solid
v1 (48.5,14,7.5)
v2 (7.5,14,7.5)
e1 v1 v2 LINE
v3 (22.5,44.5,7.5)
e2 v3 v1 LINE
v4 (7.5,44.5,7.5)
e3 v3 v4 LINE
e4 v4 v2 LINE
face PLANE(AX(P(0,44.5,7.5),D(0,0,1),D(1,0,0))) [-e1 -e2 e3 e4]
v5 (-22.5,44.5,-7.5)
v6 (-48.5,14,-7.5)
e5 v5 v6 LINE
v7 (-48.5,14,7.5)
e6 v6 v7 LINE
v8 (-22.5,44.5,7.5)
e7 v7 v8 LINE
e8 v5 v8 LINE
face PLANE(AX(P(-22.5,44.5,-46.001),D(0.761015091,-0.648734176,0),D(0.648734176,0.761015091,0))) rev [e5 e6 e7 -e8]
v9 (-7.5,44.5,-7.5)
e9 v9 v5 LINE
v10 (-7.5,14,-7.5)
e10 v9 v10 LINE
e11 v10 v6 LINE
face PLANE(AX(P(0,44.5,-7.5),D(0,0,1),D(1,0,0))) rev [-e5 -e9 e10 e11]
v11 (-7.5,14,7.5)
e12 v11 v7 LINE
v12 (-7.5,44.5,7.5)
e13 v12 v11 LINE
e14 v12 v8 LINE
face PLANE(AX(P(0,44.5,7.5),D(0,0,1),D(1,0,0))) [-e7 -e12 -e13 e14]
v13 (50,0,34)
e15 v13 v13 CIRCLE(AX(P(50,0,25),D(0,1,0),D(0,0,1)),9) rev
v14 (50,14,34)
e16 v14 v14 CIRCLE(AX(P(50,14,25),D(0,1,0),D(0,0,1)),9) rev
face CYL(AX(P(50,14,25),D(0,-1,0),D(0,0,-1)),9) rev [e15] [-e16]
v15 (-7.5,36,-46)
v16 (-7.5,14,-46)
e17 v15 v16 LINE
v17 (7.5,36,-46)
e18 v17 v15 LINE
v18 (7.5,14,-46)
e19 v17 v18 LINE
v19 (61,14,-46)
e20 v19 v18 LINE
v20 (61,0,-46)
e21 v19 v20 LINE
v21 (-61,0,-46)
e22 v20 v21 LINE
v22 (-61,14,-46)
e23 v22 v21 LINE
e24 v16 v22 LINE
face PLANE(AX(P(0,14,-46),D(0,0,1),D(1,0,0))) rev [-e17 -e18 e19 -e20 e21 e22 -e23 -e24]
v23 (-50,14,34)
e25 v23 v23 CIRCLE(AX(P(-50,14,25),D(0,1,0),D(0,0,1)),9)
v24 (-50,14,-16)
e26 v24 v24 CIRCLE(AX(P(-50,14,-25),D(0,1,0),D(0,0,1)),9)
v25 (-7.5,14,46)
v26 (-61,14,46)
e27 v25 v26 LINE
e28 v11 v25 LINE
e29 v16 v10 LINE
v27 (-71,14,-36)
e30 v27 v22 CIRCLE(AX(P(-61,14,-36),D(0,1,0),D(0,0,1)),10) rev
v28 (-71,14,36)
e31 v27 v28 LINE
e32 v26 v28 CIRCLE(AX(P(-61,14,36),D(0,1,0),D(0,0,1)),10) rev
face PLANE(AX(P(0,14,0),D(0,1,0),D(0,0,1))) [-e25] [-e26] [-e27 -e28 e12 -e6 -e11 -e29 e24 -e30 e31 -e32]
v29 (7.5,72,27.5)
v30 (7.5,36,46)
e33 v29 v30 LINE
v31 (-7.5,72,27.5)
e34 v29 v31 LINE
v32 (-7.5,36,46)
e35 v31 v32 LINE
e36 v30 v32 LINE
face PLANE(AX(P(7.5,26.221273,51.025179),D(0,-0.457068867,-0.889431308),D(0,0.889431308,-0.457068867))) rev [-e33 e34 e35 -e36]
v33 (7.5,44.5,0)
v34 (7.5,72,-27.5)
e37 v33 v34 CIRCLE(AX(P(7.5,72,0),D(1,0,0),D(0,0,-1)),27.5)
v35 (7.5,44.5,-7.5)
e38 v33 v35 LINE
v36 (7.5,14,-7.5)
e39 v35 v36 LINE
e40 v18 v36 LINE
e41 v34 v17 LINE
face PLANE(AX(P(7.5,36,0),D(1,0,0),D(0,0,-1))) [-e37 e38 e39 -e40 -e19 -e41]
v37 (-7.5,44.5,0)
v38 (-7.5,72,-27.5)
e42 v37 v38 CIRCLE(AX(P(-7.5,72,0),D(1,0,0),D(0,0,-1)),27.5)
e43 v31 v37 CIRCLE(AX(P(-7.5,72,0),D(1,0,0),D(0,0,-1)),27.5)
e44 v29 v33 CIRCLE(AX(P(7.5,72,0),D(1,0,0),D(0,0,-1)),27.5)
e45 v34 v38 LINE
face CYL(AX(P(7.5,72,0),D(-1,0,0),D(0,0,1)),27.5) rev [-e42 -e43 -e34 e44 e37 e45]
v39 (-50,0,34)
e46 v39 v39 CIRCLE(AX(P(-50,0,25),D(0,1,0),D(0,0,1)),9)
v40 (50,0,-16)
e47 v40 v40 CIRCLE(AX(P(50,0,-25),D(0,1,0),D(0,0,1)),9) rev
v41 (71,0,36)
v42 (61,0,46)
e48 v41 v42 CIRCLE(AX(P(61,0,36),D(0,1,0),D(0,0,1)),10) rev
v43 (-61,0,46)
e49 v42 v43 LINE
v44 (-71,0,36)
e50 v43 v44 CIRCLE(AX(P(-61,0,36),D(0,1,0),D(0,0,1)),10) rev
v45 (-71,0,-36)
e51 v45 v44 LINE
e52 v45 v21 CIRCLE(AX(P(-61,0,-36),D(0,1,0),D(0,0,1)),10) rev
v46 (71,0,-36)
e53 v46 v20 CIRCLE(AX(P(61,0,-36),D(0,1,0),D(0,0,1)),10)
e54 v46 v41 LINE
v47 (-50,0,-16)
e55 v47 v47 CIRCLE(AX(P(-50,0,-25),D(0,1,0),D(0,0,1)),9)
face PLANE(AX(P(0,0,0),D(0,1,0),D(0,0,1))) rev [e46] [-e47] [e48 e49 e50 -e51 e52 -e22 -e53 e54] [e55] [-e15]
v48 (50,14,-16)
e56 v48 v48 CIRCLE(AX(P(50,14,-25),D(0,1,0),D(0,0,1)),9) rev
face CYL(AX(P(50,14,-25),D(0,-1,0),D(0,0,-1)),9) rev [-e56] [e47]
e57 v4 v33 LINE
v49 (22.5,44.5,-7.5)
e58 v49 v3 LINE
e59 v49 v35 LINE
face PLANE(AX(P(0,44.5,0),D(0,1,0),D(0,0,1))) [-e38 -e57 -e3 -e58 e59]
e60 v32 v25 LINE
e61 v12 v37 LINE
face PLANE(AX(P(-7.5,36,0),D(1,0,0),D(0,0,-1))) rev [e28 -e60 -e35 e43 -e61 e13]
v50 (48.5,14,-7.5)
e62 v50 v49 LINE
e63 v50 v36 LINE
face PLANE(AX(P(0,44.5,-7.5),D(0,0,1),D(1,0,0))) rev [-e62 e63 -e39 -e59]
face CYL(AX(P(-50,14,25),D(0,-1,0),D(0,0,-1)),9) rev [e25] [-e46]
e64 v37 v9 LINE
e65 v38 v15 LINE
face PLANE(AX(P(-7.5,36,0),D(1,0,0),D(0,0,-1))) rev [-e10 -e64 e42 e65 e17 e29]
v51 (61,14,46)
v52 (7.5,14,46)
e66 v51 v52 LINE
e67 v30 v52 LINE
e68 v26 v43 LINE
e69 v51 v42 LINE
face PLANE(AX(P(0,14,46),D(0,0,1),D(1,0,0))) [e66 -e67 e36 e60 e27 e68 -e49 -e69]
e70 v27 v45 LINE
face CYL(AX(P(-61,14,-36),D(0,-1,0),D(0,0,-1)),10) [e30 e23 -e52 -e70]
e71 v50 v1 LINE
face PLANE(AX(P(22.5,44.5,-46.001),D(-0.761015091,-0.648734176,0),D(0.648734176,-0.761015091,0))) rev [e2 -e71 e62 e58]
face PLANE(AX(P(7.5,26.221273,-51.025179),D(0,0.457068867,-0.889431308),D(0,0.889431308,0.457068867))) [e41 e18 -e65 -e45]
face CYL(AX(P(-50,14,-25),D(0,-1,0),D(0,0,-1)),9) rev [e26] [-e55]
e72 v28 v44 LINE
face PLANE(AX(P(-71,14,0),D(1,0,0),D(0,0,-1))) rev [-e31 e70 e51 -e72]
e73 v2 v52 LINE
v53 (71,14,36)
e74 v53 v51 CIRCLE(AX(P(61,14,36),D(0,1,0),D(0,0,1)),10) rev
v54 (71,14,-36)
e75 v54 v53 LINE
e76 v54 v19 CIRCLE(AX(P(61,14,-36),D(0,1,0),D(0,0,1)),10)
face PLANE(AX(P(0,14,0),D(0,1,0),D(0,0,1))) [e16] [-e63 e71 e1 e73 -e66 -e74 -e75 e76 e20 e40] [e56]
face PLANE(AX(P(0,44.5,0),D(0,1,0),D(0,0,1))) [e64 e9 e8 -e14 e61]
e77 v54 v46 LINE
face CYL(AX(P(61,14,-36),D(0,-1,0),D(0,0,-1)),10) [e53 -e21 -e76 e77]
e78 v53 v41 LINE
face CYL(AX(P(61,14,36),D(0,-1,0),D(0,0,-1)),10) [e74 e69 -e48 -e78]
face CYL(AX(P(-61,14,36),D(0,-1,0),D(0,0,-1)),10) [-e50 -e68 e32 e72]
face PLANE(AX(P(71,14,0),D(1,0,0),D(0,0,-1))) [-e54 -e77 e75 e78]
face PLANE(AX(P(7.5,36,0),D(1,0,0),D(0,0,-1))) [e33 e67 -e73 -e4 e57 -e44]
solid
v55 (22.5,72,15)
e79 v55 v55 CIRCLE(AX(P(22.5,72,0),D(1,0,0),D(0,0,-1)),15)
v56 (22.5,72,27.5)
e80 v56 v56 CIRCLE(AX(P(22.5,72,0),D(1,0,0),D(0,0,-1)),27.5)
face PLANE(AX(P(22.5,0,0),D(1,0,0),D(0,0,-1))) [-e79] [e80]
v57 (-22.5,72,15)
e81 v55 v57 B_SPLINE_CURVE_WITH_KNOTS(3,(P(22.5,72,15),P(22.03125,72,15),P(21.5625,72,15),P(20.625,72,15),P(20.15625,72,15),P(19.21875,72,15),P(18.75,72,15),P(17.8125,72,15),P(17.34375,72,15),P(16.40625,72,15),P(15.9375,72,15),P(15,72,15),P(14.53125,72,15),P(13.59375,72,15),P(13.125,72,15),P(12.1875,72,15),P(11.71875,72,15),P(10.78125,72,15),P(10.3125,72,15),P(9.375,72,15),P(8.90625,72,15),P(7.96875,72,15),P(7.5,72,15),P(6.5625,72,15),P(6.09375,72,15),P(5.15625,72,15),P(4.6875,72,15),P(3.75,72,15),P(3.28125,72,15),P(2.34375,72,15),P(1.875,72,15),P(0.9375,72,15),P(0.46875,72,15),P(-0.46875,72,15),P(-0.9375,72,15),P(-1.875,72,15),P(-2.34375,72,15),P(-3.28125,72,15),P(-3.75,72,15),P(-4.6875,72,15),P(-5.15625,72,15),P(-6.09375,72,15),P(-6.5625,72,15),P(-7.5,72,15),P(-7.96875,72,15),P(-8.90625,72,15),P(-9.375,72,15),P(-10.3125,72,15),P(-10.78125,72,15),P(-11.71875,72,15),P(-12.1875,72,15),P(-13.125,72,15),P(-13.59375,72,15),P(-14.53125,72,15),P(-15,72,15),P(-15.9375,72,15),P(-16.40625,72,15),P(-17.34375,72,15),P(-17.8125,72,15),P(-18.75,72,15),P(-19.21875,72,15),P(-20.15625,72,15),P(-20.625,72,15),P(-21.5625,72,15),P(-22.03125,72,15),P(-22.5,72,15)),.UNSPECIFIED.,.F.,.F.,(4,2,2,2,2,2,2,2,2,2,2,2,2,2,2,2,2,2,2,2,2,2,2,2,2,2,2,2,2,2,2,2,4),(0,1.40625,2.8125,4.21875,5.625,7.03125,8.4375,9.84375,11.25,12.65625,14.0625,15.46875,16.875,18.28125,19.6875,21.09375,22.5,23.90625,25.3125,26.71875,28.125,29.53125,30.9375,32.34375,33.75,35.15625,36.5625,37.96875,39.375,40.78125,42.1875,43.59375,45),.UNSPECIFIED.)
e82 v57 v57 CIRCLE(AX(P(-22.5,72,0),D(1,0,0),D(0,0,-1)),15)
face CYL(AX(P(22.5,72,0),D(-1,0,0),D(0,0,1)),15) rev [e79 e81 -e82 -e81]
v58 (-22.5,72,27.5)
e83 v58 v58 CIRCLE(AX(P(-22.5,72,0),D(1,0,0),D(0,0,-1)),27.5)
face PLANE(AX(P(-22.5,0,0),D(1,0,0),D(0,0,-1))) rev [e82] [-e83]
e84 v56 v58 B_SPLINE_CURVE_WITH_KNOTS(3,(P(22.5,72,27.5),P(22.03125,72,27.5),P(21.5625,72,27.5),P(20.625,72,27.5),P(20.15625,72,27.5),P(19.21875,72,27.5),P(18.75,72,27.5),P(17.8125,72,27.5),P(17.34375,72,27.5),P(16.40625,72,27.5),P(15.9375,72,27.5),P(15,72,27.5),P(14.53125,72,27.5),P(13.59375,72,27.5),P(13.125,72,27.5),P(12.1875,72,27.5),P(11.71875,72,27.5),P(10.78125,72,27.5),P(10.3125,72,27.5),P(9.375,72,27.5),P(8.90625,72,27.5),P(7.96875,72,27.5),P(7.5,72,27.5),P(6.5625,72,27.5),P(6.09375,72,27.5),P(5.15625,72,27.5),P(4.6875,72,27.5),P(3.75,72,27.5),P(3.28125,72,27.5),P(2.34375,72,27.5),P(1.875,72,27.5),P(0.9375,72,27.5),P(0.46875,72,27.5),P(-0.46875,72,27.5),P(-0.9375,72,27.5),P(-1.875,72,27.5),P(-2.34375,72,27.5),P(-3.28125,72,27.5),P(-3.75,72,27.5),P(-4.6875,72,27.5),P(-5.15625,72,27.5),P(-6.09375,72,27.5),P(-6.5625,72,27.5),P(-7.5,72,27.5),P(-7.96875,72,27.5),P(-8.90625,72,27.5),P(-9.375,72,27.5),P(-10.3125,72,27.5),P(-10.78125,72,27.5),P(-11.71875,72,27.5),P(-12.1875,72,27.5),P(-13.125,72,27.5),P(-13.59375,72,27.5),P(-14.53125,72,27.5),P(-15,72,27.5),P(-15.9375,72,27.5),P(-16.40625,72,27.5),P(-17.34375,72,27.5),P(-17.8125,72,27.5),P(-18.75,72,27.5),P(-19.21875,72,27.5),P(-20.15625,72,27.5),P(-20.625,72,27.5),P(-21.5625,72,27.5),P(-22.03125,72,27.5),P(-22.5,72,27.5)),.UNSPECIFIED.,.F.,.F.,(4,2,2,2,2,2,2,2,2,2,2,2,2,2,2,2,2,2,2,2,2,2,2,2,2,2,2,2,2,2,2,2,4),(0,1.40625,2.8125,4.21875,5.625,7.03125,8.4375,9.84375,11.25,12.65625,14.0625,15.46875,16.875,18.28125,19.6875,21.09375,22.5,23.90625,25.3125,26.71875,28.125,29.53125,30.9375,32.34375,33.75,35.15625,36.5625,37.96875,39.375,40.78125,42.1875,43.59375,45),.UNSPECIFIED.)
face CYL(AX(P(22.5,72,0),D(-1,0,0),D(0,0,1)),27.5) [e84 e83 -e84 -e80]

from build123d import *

# Parameters (mm, degrees)
SKETCH1_R                = 9
BOSS_EXTRUDE1_DEPTH      = 14
BOSS_EXTRUDE1_2_DEPTH    = 14
SKETCH1_5_W              = 15
SKETCH1_5_H              = 38.5
BOSS_EXTRUDE2_DEPTH      = 36
BOSS_EXTRUDE3_DEPTH      = 44.5
CUT_EXTRUDE1_REACH       = 101.416
SKETCH3_R                = 27.5
SKETCH3_R_2              = 15
BOSS_EXTRUDE4_DEPTH      = 22.5
BOSS_EXTRUDE19_START     = -7.5
BOSS_EXTRUDE19_OUTLINE_R = 15
BOSS_EXTRUDE19_DEPTH     = 15
BOSS_EXTRUDE19_2_DEPTH   = 15
SKETCH4_R                = 15
CUT_EXTRUDE2_DEPTH       = 87.5


# Read off the part's stored shape, not the designer's step: Boss-Extrude19
with BuildPart() as part:
    # Sketch1 → Boss-Extrude1 (new body)
    with BuildSketch(Plane(origin=(0, 0, 0), x_dir=(1, 0, 0), z_dir=(0, 1, 0))):
        with BuildLine():
            Line((-7.5, 7.5), (-7.5, 46))
            Line((-7.5, 46), (-61, 46))
            ThreePointArc((-61, 46), (-68.071067812, 43.071067812), (-71, 36))
            Line((-71, 36), (-71, -36))
            ThreePointArc((-71, -36), (-68.071067812, -43.071067812), (-61, -46))
            Line((-61, -46), (-7.5, -46))
            Line((-7.5, -46), (-7.5, -7.5))
            Line((-7.5, -7.5), (-48.5, -7.5))
            Line((-48.5, -7.5), (-48.5, 7.5))
            Line((-48.5, 7.5), (-7.5, 7.5))
        make_face()
        with Locations(Location((-50, -25, 0), (0, 0, 270))):
            Circle(SKETCH1_R, mode=Mode.SUBTRACT)
        with Locations(Location((-50, 25, 0), (0, 0, 270))):
            Circle(SKETCH1_R, mode=Mode.SUBTRACT)
    extrude(amount=BOSS_EXTRUDE1_DEPTH)



with BuildPart() as body_2:
    # Sketch1 → Boss-Extrude1 2 (new body)
    with BuildSketch(Plane(origin=(0, 0, 0), x_dir=(1, 0, 0), z_dir=(0, 1, 0))):
        with BuildLine():
            ThreePointArc((71, 36), (68.071067812, 43.071067812), (61, 46))
            Line((61, 46), (7.5, 46))
            Line((7.5, 46), (7.5, 7.5))
            Line((7.5, 7.5), (48.5, 7.5))
            Line((48.5, 7.5), (48.5, -7.5))
            Line((48.5, -7.5), (7.5, -7.5))
            Line((7.5, -7.5), (7.5, -46))
            Line((7.5, -46), (61, -46))
            ThreePointArc((61, -46), (68.071067812, -43.071067812), (71, -36))
            Line((71, -36), (71, 36))
        make_face()
        with Locations(Location((50, -25, 0), (0, 0, 270))):
            Circle(SKETCH1_R, mode=Mode.SUBTRACT)
        with Locations(Location((50, 25, 0), (0, 0, 270))):
            Circle(SKETCH1_R, mode=Mode.SUBTRACT)
    extrude(amount=BOSS_EXTRUDE1_2_DEPTH)


with BuildPart() as part_1:
    add(part.part)

    add(body_2.part)  # Boss-Extrude2 merges body 2
    # Sketch1<5> → Boss-Extrude2 (add)
    with BuildSketch(Plane(origin=(0, 0, 0), x_dir=(1, 0, 0), z_dir=(0, 1, 0))):
        with Locations((0, -26.75)):
            Rectangle(SKETCH1_5_W, SKETCH1_5_H)
        with Locations((0, 26.75)):
            Rectangle(SKETCH1_5_W, SKETCH1_5_H)
    extrude(amount=BOSS_EXTRUDE2_DEPTH)

    # Sketch1<8> → Boss-Extrude3 (add)
    with BuildSketch(Plane(origin=(0, 0, 0), x_dir=(1, 0, 0), z_dir=(0, 1, 0))):
        Polygon((48.5, 7.5), (7.5, 7.5), (-7.5, 7.5), (-48.5, 7.5), (-48.5, -7.5), (-7.5, -7.5), (7.5, -7.5), (48.5, -7.5), align=None)
    extrude(amount=BOSS_EXTRUDE3_DEPTH)

    # Sketch2 → Cut-Extrude1 (cut, up to next)
    with BuildSketch(Plane.XY.offset(7.5), mode=Mode.PRIVATE) as cut_extrude1_sk1:
        Polygon((-22.5, 44.5), (-48.5, 14), (-48.5, 44.5), align=None)
    cut_extrude1_tool1 = extrude(cut_extrude1_sk1.sketch, amount=-CUT_EXTRUDE1_REACH, mode=Mode.PRIVATE) & part_1.part
    # Sketch2 → Cut-Extrude1 (cut, up to next)
    with BuildSketch(Plane.XY.offset(7.5), mode=Mode.PRIVATE) as cut_extrude1_sk2:
        Polygon((22.5, 44.5), (48.5, 14), (48.5, 44.5), align=None)
    cut_extrude1_tool2 = extrude(cut_extrude1_sk2.sketch, amount=-CUT_EXTRUDE1_REACH, mode=Mode.PRIVATE) & part_1.part
    add(cut_extrude1_tool1.solids().sort_by_distance((-39.833333, 34.333333, 7.5))[0], mode=Mode.SUBTRACT)
    add(cut_extrude1_tool2.solids().sort_by_distance((39.833333, 34.333333, 7.5))[0], mode=Mode.SUBTRACT)

    # Boss-Extrude19 2 outline → Boss-Extrude19 2 (add)
    with BuildSketch(Plane(origin=(0, 0, 0), x_dir=(0, 0, -1), z_dir=(1, 0, 0)).offset(BOSS_EXTRUDE19_START)):
        with BuildLine():
            Line((46, 36), (27.5, 72))
            ThreePointArc((27.5, 72), (19.445436483, 52.554563517), (0, 44.5))
            Line((0, 44.5), (7.5, 44.5))
            Line((7.5, 44.5), (7.5, 36))
            Line((7.5, 36), (46, 36))
        make_face()
        with BuildLine():
            Line((-7.5, 44.5), (0, 44.5))
            ThreePointArc((0, 44.5), (-19.445436483, 52.554563517), (-27.5, 72))
            Line((-27.5, 72), (-46, 36))
            Line((-46, 36), (-7.5, 36))
            Line((-7.5, 36), (-7.5, 44.5))
        make_face()
    extrude(amount=BOSS_EXTRUDE19_2_DEPTH)


with BuildPart() as body_2_2:
    # Sketch3 → Boss-Extrude4 (new, symmetric)
    with BuildSketch(Plane(origin=(0, 0, 0), x_dir=(0, 0, -1), z_dir=(1, 0, 0))):
        with Locations(Location((0, 72, 0), (0, 0, 180))):
            Circle(SKETCH3_R)
        with Locations(Location((0, 72, 0), (0, 0, 180))):
            Circle(SKETCH3_R_2, mode=Mode.SUBTRACT)
    extrude(amount=BOSS_EXTRUDE4_DEPTH, both=True)

    # Boss-Extrude19 outline → Boss-Extrude19 (add)
    with BuildSketch(Plane(origin=(0, 0, 0), x_dir=(0, 0, -1), z_dir=(1, 0, 0)).offset(BOSS_EXTRUDE19_START)):
        with Locations((0, 72)):
            Circle(BOSS_EXTRUDE19_OUTLINE_R)
    extrude(amount=BOSS_EXTRUDE19_DEPTH)

    # Sketch4 → Cut-Extrude2 (cut, symmetric)
    with BuildSketch(Plane(origin=(7.5, 0, 0), x_dir=(0, 0, -1), z_dir=(1, 0, 0))):
        with Locations(Location((0, 72, 0), (0, 0, 180))):
            Circle(SKETCH4_R)
    extrude(amount=CUT_EXTRUDE2_DEPTH, both=True, mode=Mode.SUBTRACT)


solid = Compound([part_1.part, body_2_2.part])
